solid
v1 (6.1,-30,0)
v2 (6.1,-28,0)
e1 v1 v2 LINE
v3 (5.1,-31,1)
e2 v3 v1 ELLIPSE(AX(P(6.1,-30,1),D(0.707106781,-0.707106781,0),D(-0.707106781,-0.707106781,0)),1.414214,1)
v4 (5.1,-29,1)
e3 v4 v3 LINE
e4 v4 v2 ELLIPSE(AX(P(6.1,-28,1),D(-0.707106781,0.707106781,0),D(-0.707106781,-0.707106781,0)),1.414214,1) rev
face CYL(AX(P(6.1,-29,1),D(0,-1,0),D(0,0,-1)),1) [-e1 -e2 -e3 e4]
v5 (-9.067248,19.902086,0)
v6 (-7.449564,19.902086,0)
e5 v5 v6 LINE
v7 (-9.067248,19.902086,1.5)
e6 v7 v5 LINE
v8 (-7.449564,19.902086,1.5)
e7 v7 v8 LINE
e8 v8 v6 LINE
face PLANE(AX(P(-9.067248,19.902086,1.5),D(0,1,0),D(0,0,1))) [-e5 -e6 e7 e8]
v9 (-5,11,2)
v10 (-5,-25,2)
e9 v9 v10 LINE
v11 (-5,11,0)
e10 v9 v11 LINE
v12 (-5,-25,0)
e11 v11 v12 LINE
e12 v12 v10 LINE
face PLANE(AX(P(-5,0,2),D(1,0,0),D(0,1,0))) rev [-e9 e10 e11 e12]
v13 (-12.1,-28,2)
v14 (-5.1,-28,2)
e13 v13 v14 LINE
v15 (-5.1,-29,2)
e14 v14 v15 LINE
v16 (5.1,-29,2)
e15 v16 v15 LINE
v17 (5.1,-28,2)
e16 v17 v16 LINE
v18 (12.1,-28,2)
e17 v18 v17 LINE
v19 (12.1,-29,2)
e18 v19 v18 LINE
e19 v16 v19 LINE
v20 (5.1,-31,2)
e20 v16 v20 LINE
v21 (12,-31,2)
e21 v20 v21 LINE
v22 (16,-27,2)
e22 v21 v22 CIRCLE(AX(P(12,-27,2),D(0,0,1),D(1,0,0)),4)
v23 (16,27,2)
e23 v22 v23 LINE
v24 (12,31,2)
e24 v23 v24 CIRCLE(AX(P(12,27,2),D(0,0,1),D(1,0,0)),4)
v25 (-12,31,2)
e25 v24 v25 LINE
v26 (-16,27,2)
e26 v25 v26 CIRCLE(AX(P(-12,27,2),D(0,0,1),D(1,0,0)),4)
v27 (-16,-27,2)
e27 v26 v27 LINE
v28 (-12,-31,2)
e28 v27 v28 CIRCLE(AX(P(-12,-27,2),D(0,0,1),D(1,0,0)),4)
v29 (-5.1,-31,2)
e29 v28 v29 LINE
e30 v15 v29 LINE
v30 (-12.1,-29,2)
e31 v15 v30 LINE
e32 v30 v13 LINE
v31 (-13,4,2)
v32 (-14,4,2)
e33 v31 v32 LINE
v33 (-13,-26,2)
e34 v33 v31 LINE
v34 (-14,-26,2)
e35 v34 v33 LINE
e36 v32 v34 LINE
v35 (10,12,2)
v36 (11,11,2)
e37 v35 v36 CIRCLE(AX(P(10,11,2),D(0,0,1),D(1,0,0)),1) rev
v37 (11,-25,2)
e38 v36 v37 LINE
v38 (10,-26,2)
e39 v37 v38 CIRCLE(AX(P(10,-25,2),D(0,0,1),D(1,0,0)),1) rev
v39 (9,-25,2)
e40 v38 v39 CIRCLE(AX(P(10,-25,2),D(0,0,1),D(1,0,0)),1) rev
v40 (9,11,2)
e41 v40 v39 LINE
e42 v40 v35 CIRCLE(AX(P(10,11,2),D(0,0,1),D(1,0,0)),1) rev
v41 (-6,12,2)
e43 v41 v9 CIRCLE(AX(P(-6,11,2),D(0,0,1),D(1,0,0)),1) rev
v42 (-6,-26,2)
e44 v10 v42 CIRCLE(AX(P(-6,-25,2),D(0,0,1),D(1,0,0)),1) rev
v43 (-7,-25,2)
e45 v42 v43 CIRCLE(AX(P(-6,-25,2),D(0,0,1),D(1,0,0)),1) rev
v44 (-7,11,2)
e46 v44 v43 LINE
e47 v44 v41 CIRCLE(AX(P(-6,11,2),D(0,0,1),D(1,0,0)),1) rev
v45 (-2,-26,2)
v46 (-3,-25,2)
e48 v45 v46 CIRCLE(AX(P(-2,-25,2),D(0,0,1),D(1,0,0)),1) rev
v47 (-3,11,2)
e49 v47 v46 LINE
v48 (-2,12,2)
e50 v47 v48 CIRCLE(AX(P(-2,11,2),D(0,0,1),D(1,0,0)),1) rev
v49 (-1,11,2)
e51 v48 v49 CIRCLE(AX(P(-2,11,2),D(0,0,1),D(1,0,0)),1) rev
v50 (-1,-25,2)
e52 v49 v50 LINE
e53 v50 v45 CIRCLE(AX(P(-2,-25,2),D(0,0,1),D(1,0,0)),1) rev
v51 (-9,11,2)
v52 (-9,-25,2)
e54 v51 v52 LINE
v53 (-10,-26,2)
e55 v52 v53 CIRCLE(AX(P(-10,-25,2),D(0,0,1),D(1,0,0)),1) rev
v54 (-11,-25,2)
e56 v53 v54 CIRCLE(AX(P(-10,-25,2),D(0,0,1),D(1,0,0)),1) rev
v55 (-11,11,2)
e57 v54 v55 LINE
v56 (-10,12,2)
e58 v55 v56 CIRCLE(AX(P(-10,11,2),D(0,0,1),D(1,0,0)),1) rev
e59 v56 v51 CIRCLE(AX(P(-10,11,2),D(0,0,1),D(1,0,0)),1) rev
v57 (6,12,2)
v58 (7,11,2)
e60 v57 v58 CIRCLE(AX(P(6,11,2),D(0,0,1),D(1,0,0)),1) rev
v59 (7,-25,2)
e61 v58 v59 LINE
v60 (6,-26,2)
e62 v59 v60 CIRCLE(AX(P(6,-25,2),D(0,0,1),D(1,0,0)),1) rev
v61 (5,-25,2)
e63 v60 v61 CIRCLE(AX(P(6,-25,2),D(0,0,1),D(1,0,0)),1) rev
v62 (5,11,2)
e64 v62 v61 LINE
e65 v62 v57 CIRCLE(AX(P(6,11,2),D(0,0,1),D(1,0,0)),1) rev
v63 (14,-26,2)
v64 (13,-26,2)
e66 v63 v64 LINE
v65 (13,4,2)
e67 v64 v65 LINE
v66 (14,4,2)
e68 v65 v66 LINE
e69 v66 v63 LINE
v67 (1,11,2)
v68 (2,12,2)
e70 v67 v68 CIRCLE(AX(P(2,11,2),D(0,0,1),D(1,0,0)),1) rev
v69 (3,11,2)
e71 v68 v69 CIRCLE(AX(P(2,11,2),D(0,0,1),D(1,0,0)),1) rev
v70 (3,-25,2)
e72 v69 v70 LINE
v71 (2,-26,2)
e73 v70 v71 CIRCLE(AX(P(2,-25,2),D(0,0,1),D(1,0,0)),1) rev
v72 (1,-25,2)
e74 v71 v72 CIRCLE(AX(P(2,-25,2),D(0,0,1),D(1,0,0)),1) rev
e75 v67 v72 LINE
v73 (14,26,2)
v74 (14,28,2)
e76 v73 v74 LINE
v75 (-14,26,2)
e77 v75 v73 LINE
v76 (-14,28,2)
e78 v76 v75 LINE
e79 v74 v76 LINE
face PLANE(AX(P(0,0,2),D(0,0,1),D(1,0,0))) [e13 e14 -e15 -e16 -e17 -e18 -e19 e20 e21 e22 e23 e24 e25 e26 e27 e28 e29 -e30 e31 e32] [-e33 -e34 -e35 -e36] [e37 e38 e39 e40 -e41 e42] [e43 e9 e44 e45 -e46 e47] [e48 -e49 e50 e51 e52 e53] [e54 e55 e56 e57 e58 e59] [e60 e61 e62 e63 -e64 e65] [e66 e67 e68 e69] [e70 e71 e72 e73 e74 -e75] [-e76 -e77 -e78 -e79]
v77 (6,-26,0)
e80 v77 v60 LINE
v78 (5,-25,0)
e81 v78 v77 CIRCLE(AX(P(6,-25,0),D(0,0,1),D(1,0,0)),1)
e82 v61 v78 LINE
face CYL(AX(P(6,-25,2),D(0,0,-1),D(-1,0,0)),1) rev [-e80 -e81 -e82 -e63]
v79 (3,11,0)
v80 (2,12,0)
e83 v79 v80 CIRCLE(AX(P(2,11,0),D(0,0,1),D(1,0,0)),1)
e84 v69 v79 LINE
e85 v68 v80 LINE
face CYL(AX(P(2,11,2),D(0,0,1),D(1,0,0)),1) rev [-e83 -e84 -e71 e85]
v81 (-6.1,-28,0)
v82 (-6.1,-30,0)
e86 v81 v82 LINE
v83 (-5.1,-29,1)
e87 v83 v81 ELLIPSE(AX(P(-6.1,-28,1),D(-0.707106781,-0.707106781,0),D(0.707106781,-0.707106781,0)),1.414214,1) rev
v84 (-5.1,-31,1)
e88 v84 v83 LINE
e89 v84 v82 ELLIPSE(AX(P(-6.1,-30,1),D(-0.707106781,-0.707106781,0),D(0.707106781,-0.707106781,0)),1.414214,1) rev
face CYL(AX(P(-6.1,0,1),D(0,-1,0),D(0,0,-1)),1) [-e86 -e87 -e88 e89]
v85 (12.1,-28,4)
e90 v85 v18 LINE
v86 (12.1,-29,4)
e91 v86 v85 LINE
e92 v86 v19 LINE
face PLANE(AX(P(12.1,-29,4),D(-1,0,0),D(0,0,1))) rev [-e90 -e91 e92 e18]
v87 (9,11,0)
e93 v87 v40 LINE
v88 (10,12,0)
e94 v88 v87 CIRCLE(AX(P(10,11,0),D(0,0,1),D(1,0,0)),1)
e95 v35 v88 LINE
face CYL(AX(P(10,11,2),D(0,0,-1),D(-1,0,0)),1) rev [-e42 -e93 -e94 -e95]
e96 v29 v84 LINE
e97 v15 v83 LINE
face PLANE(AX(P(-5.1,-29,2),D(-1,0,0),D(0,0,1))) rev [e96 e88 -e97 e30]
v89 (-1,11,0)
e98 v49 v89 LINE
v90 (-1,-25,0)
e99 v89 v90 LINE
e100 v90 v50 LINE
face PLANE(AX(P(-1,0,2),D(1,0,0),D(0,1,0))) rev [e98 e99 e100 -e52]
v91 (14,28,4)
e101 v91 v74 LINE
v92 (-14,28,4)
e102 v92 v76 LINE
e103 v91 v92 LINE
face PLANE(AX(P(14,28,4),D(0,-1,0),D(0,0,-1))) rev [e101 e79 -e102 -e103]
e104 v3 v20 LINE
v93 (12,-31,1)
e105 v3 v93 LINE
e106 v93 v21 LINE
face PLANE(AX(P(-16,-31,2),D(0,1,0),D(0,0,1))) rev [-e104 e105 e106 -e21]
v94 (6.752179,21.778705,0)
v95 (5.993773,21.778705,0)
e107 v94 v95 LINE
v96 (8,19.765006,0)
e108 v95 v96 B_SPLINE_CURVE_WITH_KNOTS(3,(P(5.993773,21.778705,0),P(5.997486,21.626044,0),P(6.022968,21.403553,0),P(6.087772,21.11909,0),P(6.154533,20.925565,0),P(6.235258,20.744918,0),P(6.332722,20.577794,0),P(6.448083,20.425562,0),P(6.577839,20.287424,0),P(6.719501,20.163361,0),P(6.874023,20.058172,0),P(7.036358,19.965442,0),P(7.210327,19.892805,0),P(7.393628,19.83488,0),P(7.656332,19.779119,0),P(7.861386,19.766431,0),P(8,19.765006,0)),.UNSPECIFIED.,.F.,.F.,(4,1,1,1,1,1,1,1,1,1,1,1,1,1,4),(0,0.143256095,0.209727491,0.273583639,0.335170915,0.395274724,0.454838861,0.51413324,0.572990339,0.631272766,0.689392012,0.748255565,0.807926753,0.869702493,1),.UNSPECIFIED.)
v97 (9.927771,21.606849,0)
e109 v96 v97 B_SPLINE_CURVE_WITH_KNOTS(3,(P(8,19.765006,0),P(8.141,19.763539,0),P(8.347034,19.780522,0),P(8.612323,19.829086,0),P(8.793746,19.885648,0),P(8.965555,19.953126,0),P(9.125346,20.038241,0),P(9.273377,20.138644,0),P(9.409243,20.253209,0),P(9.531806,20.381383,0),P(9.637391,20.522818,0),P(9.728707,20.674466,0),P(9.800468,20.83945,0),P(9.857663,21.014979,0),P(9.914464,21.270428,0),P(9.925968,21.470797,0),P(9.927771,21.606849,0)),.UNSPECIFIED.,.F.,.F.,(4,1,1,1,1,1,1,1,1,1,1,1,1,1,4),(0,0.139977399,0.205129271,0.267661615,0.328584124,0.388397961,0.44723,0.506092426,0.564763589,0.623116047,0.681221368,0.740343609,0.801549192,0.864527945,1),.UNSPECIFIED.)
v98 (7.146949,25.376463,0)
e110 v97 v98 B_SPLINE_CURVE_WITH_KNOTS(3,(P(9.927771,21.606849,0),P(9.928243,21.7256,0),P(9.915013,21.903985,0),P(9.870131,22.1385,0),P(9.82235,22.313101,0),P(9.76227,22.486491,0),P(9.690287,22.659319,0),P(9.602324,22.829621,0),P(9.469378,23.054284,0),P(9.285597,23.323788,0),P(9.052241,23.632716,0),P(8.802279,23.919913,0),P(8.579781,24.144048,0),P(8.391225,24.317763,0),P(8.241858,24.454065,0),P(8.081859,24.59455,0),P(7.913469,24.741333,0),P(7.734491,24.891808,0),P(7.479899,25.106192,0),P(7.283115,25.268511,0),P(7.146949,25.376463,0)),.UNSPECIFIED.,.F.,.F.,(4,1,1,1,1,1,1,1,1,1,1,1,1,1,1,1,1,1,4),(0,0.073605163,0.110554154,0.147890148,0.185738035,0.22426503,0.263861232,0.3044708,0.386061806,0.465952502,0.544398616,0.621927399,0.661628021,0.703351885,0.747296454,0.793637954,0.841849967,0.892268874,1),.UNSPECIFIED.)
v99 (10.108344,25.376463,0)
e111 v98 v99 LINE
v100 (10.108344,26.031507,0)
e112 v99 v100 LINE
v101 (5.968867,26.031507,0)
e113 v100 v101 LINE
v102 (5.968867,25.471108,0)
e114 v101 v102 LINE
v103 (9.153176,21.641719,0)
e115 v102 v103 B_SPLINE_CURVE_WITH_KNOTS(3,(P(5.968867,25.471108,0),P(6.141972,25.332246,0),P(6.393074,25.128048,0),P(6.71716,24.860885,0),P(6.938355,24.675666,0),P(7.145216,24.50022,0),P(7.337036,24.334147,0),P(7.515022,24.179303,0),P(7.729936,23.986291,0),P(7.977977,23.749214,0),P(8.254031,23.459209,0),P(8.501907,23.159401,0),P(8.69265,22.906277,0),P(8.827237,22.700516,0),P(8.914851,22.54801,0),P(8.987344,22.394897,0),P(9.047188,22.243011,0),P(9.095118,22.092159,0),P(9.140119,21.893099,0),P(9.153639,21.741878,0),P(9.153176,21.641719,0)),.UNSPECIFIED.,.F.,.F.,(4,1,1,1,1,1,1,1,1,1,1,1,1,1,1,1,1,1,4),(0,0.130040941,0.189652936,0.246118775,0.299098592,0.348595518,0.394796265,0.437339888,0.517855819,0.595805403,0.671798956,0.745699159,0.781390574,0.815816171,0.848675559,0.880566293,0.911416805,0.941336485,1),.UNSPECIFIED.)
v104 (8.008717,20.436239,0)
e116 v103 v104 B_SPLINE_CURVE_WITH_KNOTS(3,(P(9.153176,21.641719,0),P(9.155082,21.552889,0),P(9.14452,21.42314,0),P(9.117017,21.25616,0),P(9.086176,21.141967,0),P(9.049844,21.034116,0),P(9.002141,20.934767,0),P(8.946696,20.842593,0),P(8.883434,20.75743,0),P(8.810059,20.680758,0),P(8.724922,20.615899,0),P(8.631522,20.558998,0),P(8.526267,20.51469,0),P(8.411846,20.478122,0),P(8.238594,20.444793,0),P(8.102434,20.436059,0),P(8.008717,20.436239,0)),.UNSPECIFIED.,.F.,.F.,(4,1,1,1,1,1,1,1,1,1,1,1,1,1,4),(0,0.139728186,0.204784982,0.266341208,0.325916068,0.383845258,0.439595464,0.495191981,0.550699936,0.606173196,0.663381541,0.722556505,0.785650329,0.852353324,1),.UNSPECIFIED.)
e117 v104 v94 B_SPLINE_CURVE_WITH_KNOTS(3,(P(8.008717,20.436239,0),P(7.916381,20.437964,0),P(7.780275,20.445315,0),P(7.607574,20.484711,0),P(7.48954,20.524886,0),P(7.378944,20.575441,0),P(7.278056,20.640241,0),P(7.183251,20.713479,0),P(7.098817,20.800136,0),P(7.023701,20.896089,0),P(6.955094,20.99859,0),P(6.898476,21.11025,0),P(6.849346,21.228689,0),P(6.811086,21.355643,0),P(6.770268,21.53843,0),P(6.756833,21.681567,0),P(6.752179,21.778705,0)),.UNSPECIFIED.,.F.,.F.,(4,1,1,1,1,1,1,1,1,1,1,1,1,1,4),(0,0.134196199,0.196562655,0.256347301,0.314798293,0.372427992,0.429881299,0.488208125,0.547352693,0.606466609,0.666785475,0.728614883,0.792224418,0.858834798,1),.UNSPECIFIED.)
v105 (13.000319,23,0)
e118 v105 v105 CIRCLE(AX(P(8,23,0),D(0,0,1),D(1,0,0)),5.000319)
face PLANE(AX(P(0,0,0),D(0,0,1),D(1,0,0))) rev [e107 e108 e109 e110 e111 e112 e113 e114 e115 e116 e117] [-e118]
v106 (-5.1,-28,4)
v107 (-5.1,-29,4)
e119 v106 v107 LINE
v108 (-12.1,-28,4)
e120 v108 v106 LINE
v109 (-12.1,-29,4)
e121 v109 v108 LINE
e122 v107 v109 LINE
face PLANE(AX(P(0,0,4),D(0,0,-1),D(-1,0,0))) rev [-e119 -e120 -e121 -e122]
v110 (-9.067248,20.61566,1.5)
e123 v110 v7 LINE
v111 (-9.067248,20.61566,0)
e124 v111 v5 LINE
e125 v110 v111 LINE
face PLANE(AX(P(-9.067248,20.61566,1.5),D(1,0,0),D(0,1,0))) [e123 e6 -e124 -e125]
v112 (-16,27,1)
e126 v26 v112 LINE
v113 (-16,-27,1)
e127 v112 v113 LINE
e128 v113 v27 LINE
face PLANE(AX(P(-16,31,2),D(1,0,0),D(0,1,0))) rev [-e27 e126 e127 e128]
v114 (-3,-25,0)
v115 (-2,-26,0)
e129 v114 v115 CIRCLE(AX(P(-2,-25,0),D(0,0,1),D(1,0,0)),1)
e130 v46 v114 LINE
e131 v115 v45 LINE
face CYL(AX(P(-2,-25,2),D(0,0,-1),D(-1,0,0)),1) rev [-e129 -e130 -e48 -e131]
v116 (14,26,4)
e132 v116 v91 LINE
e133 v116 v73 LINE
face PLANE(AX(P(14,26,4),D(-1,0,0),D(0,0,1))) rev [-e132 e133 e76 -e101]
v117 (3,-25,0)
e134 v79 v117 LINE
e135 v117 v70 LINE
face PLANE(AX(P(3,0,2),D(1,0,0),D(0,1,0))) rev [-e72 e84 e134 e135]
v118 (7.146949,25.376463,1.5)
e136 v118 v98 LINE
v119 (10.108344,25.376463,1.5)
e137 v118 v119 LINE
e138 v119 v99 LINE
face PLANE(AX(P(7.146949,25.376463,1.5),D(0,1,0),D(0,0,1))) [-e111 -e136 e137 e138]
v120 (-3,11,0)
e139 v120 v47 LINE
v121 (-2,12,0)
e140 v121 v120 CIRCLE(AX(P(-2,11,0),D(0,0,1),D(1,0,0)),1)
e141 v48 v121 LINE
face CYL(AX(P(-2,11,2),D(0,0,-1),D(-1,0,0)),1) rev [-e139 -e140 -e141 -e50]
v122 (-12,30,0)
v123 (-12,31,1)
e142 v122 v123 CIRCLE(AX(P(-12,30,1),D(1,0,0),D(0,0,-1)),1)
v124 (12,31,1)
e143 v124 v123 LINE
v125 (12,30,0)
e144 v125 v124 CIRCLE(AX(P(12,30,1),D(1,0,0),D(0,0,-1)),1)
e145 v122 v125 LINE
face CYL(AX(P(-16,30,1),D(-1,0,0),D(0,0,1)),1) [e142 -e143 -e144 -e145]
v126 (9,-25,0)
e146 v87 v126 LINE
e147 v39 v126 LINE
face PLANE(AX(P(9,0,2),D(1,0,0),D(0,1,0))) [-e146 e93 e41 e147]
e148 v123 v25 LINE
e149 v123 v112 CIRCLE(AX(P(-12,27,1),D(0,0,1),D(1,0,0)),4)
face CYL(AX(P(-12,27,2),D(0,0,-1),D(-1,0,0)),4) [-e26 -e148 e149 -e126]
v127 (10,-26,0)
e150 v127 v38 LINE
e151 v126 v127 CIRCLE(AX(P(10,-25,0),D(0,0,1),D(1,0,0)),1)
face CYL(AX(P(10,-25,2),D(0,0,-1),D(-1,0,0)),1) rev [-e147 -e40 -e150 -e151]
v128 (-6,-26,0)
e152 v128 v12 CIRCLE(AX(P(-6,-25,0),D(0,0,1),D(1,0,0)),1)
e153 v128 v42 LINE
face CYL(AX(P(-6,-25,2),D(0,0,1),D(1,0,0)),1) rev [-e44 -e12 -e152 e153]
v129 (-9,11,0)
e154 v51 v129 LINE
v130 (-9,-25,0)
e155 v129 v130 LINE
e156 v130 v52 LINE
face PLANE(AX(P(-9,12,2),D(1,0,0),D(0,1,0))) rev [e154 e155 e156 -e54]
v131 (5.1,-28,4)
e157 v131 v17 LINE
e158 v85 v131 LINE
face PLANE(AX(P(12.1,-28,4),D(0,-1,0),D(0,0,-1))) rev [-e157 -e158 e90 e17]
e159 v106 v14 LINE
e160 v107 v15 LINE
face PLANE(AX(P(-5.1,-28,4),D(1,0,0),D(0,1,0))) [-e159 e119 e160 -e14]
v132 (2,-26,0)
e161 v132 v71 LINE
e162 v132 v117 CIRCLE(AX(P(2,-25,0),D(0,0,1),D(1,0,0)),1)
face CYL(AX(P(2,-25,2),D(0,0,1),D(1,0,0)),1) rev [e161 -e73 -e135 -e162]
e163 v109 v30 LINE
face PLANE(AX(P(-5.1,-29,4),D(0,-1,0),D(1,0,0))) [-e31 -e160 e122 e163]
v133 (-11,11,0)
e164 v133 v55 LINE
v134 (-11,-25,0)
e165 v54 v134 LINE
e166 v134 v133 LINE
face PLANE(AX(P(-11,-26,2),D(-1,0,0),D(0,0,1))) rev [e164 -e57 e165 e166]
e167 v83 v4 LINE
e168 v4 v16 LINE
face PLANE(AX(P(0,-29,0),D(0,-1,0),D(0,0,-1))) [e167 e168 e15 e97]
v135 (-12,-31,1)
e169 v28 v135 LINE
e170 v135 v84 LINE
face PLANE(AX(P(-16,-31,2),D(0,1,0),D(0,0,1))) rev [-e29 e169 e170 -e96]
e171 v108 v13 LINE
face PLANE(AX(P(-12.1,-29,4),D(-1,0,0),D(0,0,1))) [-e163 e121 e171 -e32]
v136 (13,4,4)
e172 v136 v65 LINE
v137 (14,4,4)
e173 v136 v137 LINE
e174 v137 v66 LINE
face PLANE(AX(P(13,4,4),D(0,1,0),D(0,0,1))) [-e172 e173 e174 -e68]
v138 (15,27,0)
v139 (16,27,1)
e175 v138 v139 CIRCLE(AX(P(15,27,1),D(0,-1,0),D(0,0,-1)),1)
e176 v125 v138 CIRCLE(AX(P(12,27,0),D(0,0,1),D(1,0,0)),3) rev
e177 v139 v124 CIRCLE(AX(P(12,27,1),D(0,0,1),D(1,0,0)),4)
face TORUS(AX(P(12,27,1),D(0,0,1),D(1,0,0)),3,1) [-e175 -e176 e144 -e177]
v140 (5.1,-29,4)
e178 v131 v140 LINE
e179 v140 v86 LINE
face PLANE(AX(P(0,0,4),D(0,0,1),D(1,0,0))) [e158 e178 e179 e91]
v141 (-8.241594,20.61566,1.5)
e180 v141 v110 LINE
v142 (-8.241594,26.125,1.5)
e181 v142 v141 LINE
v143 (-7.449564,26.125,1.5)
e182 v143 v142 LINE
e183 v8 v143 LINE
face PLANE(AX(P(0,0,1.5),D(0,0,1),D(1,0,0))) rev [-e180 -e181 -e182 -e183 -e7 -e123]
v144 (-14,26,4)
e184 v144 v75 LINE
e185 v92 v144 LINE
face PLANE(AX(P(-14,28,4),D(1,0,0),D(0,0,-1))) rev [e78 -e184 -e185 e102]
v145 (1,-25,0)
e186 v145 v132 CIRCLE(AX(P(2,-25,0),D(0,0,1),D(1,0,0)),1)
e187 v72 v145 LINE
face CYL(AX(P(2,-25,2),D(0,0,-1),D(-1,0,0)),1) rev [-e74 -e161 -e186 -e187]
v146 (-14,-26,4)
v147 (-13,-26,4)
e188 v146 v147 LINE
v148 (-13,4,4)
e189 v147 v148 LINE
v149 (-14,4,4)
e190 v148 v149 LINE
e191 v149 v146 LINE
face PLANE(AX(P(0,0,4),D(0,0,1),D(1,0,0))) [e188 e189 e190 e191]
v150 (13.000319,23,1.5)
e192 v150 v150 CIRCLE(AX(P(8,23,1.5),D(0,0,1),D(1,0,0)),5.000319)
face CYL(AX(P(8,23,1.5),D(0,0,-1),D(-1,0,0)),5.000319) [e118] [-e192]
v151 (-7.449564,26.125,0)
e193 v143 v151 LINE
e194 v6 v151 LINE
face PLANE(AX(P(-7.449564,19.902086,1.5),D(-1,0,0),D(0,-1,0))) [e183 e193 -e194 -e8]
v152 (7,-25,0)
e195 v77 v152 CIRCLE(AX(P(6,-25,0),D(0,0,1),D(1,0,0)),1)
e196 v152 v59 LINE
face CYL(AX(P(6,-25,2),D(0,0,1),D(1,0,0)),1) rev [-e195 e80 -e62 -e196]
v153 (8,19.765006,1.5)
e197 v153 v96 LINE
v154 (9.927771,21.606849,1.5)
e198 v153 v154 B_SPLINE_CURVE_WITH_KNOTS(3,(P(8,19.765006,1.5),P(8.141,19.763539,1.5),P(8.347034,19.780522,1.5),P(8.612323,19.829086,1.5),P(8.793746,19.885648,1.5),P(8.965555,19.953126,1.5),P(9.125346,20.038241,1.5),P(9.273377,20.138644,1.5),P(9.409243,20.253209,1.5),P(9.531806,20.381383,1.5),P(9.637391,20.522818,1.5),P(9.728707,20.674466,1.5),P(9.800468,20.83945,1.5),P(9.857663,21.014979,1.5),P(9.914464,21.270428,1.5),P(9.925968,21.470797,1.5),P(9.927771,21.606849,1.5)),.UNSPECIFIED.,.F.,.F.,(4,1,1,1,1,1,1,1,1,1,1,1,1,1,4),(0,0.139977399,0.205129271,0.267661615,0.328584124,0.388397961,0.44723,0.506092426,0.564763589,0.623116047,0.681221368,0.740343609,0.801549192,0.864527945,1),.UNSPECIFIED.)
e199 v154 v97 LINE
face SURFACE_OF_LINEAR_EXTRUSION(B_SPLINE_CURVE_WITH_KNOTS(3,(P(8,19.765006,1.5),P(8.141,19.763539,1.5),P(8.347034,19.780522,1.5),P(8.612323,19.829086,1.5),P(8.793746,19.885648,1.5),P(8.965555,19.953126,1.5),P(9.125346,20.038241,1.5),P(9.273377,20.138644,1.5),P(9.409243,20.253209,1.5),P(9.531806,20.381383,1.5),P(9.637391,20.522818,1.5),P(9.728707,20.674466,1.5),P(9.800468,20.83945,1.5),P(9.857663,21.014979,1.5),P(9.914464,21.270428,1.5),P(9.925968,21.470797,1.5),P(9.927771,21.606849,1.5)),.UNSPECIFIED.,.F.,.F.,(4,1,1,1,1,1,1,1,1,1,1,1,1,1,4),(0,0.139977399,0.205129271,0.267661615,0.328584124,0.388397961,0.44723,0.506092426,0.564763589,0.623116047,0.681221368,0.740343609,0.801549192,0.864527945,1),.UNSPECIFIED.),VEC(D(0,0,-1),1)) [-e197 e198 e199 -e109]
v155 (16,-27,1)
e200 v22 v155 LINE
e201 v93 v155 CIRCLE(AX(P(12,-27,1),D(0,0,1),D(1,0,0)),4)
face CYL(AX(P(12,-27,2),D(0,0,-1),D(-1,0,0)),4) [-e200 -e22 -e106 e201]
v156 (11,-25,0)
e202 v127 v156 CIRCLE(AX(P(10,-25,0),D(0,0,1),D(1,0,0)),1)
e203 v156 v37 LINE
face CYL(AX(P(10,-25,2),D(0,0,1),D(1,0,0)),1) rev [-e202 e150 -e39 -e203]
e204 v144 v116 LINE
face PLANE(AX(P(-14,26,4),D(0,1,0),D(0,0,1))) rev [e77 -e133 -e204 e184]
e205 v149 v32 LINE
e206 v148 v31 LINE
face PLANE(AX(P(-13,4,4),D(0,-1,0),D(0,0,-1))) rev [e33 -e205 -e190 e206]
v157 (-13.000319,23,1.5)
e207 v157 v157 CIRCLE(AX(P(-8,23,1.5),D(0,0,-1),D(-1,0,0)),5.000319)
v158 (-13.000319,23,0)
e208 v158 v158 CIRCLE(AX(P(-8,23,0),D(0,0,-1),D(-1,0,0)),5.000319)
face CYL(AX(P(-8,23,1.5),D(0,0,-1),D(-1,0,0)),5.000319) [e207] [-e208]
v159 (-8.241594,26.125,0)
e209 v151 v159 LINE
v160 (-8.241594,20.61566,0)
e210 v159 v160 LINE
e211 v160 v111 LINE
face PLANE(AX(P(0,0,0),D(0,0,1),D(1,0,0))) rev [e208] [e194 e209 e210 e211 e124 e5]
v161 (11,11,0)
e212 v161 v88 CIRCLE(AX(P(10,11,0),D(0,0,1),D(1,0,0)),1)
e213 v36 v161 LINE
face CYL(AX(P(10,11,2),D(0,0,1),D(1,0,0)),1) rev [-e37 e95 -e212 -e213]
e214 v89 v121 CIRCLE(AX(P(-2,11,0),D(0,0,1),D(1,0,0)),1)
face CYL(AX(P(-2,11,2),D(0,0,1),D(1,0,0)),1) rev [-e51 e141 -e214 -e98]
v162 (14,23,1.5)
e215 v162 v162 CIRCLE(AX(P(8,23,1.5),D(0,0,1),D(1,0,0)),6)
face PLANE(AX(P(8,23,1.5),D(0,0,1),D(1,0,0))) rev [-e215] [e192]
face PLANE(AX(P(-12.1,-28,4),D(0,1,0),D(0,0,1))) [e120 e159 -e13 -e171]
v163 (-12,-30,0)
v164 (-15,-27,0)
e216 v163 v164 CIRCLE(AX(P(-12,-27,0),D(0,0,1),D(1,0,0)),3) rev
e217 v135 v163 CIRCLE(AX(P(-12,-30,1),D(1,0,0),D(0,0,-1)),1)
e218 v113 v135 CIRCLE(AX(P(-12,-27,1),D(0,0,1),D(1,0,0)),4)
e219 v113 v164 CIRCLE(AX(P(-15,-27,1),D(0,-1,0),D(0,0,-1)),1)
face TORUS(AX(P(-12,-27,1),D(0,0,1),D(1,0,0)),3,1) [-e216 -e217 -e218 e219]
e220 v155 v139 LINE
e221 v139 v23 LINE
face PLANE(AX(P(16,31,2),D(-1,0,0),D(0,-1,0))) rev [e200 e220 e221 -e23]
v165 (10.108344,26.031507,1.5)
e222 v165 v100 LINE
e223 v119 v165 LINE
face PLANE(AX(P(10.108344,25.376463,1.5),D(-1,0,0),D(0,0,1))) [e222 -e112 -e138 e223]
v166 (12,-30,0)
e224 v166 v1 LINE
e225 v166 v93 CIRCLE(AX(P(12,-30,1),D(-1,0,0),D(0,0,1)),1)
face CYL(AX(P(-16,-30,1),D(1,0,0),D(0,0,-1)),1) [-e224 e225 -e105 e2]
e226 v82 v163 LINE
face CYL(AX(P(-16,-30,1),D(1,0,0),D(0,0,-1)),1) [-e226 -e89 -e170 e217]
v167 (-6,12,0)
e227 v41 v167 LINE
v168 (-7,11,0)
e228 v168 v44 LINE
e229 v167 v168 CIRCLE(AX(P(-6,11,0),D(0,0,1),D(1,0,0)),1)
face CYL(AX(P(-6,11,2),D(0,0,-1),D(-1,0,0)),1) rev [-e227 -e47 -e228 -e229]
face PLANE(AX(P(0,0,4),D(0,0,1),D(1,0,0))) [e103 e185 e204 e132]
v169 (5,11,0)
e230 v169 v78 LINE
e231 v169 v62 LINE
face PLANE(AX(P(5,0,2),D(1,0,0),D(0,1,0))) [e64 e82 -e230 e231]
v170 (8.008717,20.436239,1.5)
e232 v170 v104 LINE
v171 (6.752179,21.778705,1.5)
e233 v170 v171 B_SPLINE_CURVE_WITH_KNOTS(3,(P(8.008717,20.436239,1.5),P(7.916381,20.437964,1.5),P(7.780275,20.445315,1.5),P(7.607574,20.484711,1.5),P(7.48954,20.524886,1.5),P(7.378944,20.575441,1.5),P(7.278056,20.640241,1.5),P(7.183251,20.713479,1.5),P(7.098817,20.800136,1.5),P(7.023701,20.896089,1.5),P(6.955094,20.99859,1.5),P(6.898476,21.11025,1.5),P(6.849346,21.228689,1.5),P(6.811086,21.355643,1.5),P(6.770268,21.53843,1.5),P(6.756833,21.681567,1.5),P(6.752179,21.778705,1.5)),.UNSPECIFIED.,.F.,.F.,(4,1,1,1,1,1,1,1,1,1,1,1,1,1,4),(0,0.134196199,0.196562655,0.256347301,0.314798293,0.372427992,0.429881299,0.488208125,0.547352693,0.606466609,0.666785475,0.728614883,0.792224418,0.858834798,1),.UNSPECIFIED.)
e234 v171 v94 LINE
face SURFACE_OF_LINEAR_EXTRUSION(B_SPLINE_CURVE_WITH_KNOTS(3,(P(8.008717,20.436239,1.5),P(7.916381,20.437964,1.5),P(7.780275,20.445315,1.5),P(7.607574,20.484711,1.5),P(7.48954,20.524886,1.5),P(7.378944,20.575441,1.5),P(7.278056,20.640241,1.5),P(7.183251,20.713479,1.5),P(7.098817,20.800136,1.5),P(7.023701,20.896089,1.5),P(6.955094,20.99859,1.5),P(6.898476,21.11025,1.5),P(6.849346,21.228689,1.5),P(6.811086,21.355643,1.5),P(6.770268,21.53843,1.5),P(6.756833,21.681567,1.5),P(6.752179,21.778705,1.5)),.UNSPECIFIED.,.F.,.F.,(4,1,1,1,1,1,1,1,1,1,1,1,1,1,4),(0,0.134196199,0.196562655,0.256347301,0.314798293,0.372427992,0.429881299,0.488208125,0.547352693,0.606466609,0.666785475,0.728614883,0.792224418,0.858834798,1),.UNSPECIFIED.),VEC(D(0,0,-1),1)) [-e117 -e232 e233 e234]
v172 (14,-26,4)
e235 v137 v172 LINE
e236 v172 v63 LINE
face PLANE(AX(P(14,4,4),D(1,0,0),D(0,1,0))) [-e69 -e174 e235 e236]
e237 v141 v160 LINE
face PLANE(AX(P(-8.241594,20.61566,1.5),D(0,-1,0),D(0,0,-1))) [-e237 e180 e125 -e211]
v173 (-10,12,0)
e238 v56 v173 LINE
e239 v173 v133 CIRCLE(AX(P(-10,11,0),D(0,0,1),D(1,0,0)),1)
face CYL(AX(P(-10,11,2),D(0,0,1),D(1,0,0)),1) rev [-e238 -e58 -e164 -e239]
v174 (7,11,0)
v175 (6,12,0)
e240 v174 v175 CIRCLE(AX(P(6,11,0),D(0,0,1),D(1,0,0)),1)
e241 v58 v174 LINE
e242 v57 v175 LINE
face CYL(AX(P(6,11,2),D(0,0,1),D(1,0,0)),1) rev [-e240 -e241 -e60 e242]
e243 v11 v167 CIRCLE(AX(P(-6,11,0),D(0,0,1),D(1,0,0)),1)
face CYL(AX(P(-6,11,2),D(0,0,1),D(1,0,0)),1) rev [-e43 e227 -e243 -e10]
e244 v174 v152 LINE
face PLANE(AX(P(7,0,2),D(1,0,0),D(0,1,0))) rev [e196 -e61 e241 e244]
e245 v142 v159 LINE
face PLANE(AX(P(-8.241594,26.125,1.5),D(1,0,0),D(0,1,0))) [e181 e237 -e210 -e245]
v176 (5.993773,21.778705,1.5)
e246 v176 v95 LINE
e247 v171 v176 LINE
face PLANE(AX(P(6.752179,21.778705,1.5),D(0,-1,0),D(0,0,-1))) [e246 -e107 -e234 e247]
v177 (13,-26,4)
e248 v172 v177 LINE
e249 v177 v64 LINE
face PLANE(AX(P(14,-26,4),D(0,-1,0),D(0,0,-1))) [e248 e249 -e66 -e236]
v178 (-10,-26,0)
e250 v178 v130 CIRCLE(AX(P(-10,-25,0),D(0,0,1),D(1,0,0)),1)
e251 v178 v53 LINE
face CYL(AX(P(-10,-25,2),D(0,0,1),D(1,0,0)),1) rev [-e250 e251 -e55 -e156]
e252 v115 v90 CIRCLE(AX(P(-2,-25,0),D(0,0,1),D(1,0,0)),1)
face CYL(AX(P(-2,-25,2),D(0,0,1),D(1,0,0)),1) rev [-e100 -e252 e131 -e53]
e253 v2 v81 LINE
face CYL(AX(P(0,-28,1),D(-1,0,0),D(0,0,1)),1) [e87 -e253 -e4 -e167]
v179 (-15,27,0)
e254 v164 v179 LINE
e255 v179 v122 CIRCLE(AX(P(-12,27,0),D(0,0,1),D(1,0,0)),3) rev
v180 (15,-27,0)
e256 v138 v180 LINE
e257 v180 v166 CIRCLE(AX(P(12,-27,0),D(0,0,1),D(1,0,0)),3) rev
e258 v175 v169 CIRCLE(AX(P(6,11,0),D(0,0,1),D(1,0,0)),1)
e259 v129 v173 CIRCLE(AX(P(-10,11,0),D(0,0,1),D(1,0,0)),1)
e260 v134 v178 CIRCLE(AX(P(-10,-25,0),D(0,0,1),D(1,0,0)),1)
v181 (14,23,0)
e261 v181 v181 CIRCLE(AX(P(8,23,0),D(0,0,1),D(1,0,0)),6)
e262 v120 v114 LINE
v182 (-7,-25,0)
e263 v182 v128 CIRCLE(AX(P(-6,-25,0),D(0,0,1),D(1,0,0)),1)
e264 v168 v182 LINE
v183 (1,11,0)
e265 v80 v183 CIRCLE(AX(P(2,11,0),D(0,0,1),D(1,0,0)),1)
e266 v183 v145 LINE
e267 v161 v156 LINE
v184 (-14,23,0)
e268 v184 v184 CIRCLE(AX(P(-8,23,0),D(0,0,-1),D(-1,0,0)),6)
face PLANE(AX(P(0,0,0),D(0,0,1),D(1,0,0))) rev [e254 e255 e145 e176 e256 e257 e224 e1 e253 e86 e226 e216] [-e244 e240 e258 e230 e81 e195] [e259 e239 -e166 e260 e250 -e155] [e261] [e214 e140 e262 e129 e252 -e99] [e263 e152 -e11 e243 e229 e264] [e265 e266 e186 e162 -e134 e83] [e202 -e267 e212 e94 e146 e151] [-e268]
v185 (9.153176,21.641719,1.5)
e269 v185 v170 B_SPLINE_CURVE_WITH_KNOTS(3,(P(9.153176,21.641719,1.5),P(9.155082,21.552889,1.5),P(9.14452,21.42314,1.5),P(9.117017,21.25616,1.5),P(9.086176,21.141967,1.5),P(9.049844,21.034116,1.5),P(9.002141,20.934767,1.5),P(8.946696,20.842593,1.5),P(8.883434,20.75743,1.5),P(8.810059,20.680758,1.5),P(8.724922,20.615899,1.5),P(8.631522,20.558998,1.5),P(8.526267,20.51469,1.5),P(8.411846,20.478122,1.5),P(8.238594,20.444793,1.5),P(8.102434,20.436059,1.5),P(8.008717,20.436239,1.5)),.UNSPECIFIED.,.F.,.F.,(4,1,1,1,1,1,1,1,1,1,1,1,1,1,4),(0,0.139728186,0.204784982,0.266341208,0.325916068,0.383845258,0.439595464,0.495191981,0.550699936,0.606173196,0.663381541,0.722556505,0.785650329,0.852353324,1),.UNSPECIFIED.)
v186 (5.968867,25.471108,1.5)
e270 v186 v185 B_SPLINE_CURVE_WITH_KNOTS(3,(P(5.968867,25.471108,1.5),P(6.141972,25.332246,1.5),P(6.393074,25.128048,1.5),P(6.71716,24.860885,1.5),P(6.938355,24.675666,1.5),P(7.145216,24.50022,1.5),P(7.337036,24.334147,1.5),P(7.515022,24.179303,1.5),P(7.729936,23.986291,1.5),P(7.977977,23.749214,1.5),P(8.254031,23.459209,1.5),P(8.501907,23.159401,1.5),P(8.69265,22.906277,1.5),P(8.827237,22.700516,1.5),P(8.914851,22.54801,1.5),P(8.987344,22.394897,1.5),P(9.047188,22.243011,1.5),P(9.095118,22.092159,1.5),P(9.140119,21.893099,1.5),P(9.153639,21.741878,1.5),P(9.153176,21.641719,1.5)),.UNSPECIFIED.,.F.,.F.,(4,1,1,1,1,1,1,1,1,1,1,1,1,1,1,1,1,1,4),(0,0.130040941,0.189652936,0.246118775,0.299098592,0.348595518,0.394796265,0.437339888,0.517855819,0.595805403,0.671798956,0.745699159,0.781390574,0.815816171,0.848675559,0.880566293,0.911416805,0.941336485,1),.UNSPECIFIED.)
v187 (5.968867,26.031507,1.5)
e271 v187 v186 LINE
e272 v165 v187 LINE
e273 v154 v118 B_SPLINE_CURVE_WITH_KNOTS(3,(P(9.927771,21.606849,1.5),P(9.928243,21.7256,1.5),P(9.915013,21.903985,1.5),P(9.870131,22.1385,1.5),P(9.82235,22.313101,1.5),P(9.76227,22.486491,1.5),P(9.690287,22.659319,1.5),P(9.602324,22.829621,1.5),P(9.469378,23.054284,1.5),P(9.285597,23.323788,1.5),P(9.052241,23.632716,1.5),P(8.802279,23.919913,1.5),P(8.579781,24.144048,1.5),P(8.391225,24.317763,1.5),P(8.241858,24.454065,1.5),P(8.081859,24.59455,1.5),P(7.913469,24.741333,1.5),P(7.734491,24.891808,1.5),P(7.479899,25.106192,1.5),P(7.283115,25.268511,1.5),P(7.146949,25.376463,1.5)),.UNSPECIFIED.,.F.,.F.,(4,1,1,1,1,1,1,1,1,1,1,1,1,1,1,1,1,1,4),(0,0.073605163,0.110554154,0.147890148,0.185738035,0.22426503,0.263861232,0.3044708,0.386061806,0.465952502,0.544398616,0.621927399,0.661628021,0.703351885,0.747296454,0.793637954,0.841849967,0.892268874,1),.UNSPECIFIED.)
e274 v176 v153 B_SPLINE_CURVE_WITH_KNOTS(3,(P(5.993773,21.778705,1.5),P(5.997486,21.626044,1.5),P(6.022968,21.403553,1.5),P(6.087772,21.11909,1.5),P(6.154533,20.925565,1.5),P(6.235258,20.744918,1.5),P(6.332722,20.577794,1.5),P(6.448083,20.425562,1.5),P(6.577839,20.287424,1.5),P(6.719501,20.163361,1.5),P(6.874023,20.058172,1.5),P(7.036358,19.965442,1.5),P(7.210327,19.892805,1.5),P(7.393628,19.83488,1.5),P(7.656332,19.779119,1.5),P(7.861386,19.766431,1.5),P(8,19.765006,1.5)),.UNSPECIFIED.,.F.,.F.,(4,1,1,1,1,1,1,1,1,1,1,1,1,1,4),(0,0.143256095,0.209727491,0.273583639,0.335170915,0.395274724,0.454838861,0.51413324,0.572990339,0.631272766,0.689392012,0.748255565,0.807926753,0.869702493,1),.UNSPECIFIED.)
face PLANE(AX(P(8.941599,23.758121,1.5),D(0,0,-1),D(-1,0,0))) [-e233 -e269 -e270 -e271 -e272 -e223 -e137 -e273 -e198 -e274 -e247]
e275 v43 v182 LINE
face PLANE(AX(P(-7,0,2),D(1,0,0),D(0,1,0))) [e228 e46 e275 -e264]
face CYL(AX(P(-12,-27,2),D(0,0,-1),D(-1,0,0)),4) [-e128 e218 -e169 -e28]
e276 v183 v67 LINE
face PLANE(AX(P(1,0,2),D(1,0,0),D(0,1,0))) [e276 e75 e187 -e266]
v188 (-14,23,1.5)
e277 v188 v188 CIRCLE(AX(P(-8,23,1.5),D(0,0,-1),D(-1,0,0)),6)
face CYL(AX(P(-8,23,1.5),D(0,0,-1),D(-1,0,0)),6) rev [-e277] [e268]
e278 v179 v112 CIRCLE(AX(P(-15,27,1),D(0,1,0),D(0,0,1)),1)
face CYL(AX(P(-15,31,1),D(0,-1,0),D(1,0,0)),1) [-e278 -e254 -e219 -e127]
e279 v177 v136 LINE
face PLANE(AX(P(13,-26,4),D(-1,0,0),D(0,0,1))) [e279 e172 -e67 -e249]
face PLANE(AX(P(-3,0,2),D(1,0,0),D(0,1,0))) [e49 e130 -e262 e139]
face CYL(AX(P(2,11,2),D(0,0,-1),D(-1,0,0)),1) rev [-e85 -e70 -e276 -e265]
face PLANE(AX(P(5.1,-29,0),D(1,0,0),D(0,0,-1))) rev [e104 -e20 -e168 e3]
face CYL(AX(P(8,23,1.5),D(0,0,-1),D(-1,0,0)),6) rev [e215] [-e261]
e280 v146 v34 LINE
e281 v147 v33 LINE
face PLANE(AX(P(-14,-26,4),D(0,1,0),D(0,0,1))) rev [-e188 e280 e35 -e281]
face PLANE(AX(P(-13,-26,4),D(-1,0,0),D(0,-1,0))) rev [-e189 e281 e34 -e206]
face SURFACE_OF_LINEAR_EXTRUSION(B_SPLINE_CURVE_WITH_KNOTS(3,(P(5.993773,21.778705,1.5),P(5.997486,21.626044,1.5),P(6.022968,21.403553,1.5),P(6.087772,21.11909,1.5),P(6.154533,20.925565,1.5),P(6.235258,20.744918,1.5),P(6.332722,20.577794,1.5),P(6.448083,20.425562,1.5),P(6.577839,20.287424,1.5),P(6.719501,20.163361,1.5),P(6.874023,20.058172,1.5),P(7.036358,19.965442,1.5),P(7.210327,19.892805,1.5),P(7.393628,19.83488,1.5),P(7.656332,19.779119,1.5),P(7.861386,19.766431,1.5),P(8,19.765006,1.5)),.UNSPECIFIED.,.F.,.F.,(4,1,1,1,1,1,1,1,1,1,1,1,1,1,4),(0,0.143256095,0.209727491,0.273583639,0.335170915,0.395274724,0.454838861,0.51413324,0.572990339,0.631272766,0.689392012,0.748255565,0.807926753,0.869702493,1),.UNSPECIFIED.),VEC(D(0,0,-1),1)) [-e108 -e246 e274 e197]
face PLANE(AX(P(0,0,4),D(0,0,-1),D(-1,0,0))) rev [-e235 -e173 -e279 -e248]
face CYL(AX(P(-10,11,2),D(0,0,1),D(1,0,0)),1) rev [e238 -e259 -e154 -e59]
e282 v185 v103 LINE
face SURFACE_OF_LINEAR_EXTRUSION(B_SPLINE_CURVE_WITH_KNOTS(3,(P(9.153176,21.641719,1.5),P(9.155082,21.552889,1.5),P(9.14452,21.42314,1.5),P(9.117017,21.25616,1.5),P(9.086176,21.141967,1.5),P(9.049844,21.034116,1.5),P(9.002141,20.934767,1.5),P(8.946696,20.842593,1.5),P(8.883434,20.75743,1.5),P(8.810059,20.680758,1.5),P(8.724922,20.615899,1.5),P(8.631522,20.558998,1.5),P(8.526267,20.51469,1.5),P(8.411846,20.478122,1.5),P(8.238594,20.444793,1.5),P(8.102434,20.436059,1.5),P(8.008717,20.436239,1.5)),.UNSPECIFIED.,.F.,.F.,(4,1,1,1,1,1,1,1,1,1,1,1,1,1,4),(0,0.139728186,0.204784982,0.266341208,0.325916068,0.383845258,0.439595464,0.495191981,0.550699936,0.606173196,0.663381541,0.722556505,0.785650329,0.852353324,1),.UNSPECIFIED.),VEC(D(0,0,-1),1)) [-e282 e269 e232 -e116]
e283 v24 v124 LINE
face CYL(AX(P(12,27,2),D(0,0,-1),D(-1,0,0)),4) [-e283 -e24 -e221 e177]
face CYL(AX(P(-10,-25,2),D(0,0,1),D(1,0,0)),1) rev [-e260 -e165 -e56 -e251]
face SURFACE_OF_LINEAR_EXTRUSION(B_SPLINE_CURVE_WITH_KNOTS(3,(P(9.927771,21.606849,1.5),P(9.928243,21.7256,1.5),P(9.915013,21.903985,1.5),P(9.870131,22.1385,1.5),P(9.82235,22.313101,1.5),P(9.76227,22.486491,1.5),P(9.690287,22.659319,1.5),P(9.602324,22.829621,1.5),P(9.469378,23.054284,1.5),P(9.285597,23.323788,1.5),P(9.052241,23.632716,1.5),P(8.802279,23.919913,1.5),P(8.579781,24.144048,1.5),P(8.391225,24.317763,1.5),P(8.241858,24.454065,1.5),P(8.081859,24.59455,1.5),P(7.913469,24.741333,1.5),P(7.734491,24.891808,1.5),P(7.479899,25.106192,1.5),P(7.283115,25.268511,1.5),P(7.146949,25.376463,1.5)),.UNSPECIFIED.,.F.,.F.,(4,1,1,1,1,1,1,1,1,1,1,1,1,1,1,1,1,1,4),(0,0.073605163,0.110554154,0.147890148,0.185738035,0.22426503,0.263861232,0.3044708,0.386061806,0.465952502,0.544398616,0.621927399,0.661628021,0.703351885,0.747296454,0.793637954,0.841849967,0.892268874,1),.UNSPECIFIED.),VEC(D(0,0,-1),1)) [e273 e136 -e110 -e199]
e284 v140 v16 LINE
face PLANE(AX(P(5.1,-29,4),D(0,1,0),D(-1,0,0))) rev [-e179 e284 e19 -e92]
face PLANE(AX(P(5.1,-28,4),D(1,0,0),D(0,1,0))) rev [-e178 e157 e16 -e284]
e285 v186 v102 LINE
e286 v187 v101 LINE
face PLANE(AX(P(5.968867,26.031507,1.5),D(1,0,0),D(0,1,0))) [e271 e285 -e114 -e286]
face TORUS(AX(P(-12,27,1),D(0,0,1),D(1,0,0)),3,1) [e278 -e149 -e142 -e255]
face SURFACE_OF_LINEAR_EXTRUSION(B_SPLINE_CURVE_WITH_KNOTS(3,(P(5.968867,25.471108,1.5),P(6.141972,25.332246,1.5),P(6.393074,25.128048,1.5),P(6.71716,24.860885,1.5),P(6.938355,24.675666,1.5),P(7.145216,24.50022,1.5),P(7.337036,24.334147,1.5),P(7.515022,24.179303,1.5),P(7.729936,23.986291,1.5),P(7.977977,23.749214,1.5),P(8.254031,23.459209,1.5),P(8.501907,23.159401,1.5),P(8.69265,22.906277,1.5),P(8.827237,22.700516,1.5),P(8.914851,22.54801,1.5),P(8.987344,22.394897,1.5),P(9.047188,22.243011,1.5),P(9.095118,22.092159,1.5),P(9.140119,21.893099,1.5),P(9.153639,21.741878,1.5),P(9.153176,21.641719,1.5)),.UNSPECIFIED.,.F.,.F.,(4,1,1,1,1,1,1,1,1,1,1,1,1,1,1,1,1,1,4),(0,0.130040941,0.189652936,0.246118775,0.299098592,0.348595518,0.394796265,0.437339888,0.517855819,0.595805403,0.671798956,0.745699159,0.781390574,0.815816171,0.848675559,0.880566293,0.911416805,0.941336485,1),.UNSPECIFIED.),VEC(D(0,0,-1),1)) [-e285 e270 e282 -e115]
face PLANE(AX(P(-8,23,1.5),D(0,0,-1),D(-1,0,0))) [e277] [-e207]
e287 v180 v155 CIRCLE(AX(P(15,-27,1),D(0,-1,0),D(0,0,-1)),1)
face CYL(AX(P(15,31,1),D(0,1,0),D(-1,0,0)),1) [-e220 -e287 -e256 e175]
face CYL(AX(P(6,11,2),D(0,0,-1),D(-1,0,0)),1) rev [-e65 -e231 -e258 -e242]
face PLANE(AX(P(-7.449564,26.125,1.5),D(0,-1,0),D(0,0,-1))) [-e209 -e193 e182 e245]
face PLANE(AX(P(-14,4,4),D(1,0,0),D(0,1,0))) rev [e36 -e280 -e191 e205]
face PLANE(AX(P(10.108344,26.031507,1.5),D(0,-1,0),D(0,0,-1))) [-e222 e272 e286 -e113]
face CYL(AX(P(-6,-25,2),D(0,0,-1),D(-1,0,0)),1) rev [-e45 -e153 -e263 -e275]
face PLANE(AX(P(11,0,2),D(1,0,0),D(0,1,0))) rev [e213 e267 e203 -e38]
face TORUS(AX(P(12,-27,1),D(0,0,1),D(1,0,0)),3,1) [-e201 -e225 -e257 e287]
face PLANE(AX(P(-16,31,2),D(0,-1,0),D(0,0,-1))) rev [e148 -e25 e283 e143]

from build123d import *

# Parameters (mm, degrees)
SKETCH1_W           = 32
SKETCH1_H           = 62
BOSS_EXTRUDE4_DEPTH = 2
SKETCH6_W           = 28
SKETCH6_H           = 2
SKETCH6_W_2         = 7
SKETCH6_H_2         = 1
SKETCH6_W_3         = 1
SKETCH6_H_3         = 30
BOSS_EXTRUDE6_DEPTH = 2
SKETCH7_R           = 6
SKETCH7_R_2         = 5.000319164
CUT_EXTRUDE3_DEPTH  = 1.5
SKETCH8_W           = 2
SKETCH8_H           = 38
CUT_EXTRUDE5_DEPTH  = 2
SKETCH26_W          = 10.2
SKETCH26_H          = 2
CUT_EXTRUDE11_DEPTH = 2
FILLET3_R           = 1
FILLET5_R           = 4
FILLET6_R           = 1


with BuildPart() as part:
    # Sketch1 → Boss-Extrude4 (new body)
    with BuildSketch(Plane.XY):
        Rectangle(SKETCH1_W, SKETCH1_H)
    extrude(amount=BOSS_EXTRUDE4_DEPTH)

    # Sketch6 → Boss-Extrude6 (add)
    with BuildSketch(Plane.XY.offset(2)):
        with Locations((0, 27)):
            Rectangle(SKETCH6_W, SKETCH6_H)
        with Locations((-8.6, -28.5)):
            Rectangle(SKETCH6_W_2, SKETCH6_H_2)
        with Locations((-13.5, -11)):
            Rectangle(SKETCH6_W_3, SKETCH6_H_3)
        with Locations((13.5, -11)):
            Rectangle(SKETCH6_W_3, SKETCH6_H_3)
        with Locations((8.6, -28.5)):
            Rectangle(SKETCH6_W_2, SKETCH6_H_2)
    extrude(amount=BOSS_EXTRUDE6_DEPTH)

    # Sketch7 → Cut-Extrude3 (cut)
    # profile 1 of 4: a face of its own
    with BuildSketch(Plane(origin=(0, 0, 0), x_dir=(-1, 0, 0), z_dir=(0, 0, -1))):
        with Locations((8, 23)):
            Circle(SKETCH7_R)
        with Locations((8, 23)):
            Circle(SKETCH7_R_2, mode=Mode.SUBTRACT)
    # profile 2 of 4: a face of its own
    with BuildSketch(Plane(origin=(0, 0, 0), x_dir=(-1, 0, 0), z_dir=(0, 0, -1))):
        with Locations(Location((-8, 23, 0), (0, 0, 180))):
            Circle(SKETCH7_R)
        with Locations(Location((-8, 23, 0), (0, 0, 180))):
            Circle(SKETCH7_R_2, mode=Mode.SUBTRACT)
    # profile 3 of 4: a face of its own
    with BuildSketch(Plane(origin=(0, 0, 0), x_dir=(-1, 0, 0), z_dir=(0, 0, -1))):
        Polygon((7.449564134, 19.902085928), (7.449564134, 26.125), (8.241594022, 26.125), (8.241594022, 20.615660025), (9.067247821, 20.615660025), (9.067247821, 19.902085928), align=None)
    # profile 4 of 4: a face of its own
    with BuildSketch(Plane(origin=(0, 0, 0), x_dir=(-1, 0, 0), z_dir=(0, 0, -1))):
        with BuildLine():
            Line((-7.146948941, 25.376463263), (-10.108343711, 25.376463263))
            Line((-10.108343711, 25.376463263), (-10.108343711, 26.031506849))
            Line((-10.108343711, 26.031506849), (-5.96886675, 26.031506849))
            Line((-5.96886675, 26.031506849), (-5.96886675, 25.471108344))
            add(Edge.make_bspline(
                [(-5.96886675, 25.471108344), (-6.141971745, 25.332246025), (-6.393074253, 25.128048459), (-6.717159934, 24.860884743), (-6.938355226, 24.675665503), (-7.14521645, 24.500220273), (-7.337036334, 24.334147369), (-7.515021507, 24.179302523), (-7.729935684, 23.986290529), (-7.97797696, 23.749213926), (-8.254030773, 23.459208844), (-8.501907476, 23.159401339), (-8.692650042, 22.906276826), (-8.827236908, 22.7005165), (-8.914850872, 22.548009682), (-8.987343685, 22.394896597), (-9.047188475, 22.243011314), (-9.09511833, 22.092158743), (-9.14011918, 21.893098726), (-9.153639256, 21.741878323), (-9.153175592, 21.641718555)],
                knots=[0, 0, 0, 0, 0.130040941, 0.189652936, 0.246118775, 0.299098592, 0.348595518, 0.394796265, 0.437339888, 0.517855819, 0.595805403, 0.671798956, 0.745699159, 0.781390574, 0.815816171, 0.848675559, 0.880566293, 0.911416805, 0.941336485, 1, 1, 1, 1], degree=3))
            add(Edge.make_bspline(
                [(-9.153175592, 21.641718555), (-9.155082227, 21.552888892), (-9.144519697, 21.423140421), (-9.117017207, 21.256160493), (-9.086176124, 21.141966589), (-9.049844313, 21.034116343), (-9.002140941, 20.934767093), (-8.946696453, 20.842593454), (-8.883433554, 20.757430331), (-8.810058845, 20.68075797), (-8.724921804, 20.615898841), (-8.631522153, 20.558997899), (-8.52626692, 20.514689776), (-8.41184588, 20.478122069), (-8.238594227, 20.444792793), (-8.102433508, 20.436059356), (-8.00871731, 20.436239103)],
                knots=[0, 0, 0, 0, 0.139728186, 0.204784982, 0.266341208, 0.325916068, 0.383845258, 0.439595464, 0.495191981, 0.550699936, 0.606173196, 0.663381541, 0.722556505, 0.785650329, 0.852353324, 1, 1, 1, 1], degree=3))
            add(Edge.make_bspline(
                [(-8.00871731, 20.436239103), (-7.916381499, 20.437963905), (-7.780275222, 20.44531508), (-7.607573636, 20.484711085), (-7.489539865, 20.524886263), (-7.37894443, 20.575440972), (-7.278056027, 20.640240509), (-7.183251352, 20.713479274), (-7.098817495, 20.800136263), (-7.023700984, 20.896089204), (-6.955094248, 20.998590264), (-6.898475794, 21.110250127), (-6.849345945, 21.228689465), (-6.811085908, 21.35564304), (-6.77026818, 21.538429964), (-6.756832641, 21.68156666), (-6.752179328, 21.778704857)],
                knots=[0, 0, 0, 0, 0.134196199, 0.196562655, 0.256347301, 0.314798293, 0.372427992, 0.429881299, 0.488208125, 0.547352693, 0.606466609, 0.666785475, 0.728614883, 0.792224418, 0.858834798, 1, 1, 1, 1], degree=3))
            Line((-6.752179328, 21.778704857), (-5.99377335, 21.778704857))
            add(Edge.make_bspline(
                [(-5.99377335, 21.778704857), (-5.997486049, 21.626043992), (-6.022968038, 21.403553268), (-6.087771701, 21.119090113), (-6.154533355, 20.925565149), (-6.235258471, 20.744918428), (-6.332722054, 20.577794308), (-6.448082734, 20.425562017), (-6.577838607, 20.287424291), (-6.719500697, 20.163361209), (-6.874023412, 20.058172324), (-7.036357792, 19.965442189), (-7.21032699, 19.892804952), (-7.393628445, 19.834880004), (-7.656331886, 19.77911898), (-7.861386403, 19.766430592), (-8, 19.765006227)],
                knots=[0, 0, 0, 0, 0.143256095, 0.209727491, 0.273583639, 0.335170915, 0.395274724, 0.454838861, 0.51413324, 0.572990339, 0.631272766, 0.689392012, 0.748255565, 0.807926753, 0.869702493, 1, 1, 1, 1], degree=3))
            add(Edge.make_bspline(
                [(-8, 19.765006227), (-8.141000178, 19.763539171), (-8.347034063, 19.780521722), (-8.612322806, 19.829086312), (-8.79374631, 19.885647608), (-8.96555498, 19.953126433), (-9.125345548, 20.038241229), (-9.273376818, 20.138643722), (-9.409243356, 20.253208897), (-9.531806427, 20.381382972), (-9.637390513, 20.522817866), (-9.728706814, 20.67446601), (-9.80046805, 20.839449985), (-9.857663027, 21.014979064), (-9.914464012, 21.270428027), (-9.92596825, 21.470796687), (-9.927770859, 21.606849315)],
                knots=[0, 0, 0, 0, 0.139977399, 0.205129271, 0.267661615, 0.328584124, 0.388397961, 0.44723, 0.506092426, 0.564763589, 0.623116047, 0.681221368, 0.740343609, 0.801549192, 0.864527945, 1, 1, 1, 1], degree=3))
            add(Edge.make_bspline(
                [(-9.927770859, 21.606849315), (-9.928242812, 21.72559986), (-9.915013433, 21.903984583), (-9.870131257, 22.138500082), (-9.822350184, 22.313101458), (-9.762269632, 22.486490626), (-9.690286657, 22.659318649), (-9.602323879, 22.829621189), (-9.469377828, 23.054284468), (-9.285596836, 23.323787524), (-9.052240665, 23.632715958), (-8.802279105, 23.919912782), (-8.579780596, 24.144048337), (-8.391224564, 24.317762692), (-8.241857572, 24.454065056), (-8.081858709, 24.594549679), (-7.913468988, 24.741333436), (-7.734490681, 24.891808295), (-7.479898932, 25.106191886), (-7.283114849, 25.268511143), (-7.146948941, 25.376463263)],
                knots=[0, 0, 0, 0, 0.073605163, 0.110554154, 0.147890148, 0.185738035, 0.22426503, 0.263861232, 0.3044708, 0.386061806, 0.465952502, 0.544398616, 0.621927399, 0.661628021, 0.703351885, 0.747296454, 0.793637954, 0.841849967, 0.892268874, 1, 1, 1, 1], degree=3))
        make_face()
    extrude(amount=-CUT_EXTRUDE3_DEPTH, mode=Mode.SUBTRACT)

    # Sketch8 → Cut-Extrude5 (cut)
    with BuildSketch(Plane(origin=(0, 0, 0), x_dir=(-1, 0, 0), z_dir=(0, 0, -1))):
        with Locations((6, -7)):
            Rectangle(SKETCH8_W, SKETCH8_H)
        with Locations((2, -7)):
            Rectangle(SKETCH8_W, SKETCH8_H)
        with Locations((-2, -7)):
            Rectangle(SKETCH8_W, SKETCH8_H)
        with Locations((-6, -7)):
            Rectangle(SKETCH8_W, SKETCH8_H)
        with Locations((-10, -7)):
            Rectangle(SKETCH8_W, SKETCH8_H)
        with Locations((10, -7)):
            Rectangle(SKETCH8_W, SKETCH8_H)
    extrude(amount=-CUT_EXTRUDE5_DEPTH, mode=Mode.SUBTRACT)

    # Sketch26 → Cut-Extrude11 (cut)
    with BuildSketch(Plane.XZ.offset(31)):
        with Locations((0, 1)):
            Rectangle(SKETCH26_W, SKETCH26_H)
    extrude(amount=-CUT_EXTRUDE11_DEPTH, mode=Mode.SUBTRACT)

    # Fillet3
    fillet3_edges = [part.edges().sort_by_distance(p)[0] for p in [
        (-9, 12, 1),
        (-5, 12, 1),
        (-1, 12, 1),
        (3, 12, 1),
        (7, 12, 1),
        (11, 12, 1),
        (9, 12, 1),
        (5, 12, 1),
        (1, 12, 1),
        (-3, 12, 1),
        (-7, 12, 1),
        (-11, 12, 1),
        (-5, -26, 1),
        (-1, -26, 1),
        (3, -26, 1),
        (7, -26, 1),
        (11, -26, 1),
        (9, -26, 1),
        (5, -26, 1),
        (1, -26, 1),
        (-3, -26, 1),
        (-7, -26, 1),
        (-9, -26, 1),
        (-11, -26, 1),
    ]]
    fillet(fillet3_edges, radius=FILLET3_R - 0.0001)  # a hair under: the kernel refuses the full size

    # Fillet5
    fillet5_edges = [part.edges().sort_by_distance(p)[0] for p in [
        (16, -31, 1),
        (-16, -31, 1),
        (-16, 31, 1),
        (16, 31, 1),
    ]]
    fillet(fillet5_edges, radius=FILLET5_R)

    # Fillet6
    fillet6_edges = [part.edges().sort_by_distance(p)[0] for p in [
        (8.55, -31, 0),
        (-5.1, -30, 0),
        (0, -29, 0),
        (5.1, -30, 0),
        (-16, 0, 0),
        (-8.55, -31, 0),
        (0, 31, 0),
        (16, 0, 0),
        (14.828427125, 29.828427125, 0),
        (14.828427125, -29.828427125, 0),
        (-14.828427125, -29.828427125, 0),
        (-14.828427125, 29.828427125, 0),
    ]]
    fillet(fillet6_edges, radius=FILLET6_R)


solid = part.part
